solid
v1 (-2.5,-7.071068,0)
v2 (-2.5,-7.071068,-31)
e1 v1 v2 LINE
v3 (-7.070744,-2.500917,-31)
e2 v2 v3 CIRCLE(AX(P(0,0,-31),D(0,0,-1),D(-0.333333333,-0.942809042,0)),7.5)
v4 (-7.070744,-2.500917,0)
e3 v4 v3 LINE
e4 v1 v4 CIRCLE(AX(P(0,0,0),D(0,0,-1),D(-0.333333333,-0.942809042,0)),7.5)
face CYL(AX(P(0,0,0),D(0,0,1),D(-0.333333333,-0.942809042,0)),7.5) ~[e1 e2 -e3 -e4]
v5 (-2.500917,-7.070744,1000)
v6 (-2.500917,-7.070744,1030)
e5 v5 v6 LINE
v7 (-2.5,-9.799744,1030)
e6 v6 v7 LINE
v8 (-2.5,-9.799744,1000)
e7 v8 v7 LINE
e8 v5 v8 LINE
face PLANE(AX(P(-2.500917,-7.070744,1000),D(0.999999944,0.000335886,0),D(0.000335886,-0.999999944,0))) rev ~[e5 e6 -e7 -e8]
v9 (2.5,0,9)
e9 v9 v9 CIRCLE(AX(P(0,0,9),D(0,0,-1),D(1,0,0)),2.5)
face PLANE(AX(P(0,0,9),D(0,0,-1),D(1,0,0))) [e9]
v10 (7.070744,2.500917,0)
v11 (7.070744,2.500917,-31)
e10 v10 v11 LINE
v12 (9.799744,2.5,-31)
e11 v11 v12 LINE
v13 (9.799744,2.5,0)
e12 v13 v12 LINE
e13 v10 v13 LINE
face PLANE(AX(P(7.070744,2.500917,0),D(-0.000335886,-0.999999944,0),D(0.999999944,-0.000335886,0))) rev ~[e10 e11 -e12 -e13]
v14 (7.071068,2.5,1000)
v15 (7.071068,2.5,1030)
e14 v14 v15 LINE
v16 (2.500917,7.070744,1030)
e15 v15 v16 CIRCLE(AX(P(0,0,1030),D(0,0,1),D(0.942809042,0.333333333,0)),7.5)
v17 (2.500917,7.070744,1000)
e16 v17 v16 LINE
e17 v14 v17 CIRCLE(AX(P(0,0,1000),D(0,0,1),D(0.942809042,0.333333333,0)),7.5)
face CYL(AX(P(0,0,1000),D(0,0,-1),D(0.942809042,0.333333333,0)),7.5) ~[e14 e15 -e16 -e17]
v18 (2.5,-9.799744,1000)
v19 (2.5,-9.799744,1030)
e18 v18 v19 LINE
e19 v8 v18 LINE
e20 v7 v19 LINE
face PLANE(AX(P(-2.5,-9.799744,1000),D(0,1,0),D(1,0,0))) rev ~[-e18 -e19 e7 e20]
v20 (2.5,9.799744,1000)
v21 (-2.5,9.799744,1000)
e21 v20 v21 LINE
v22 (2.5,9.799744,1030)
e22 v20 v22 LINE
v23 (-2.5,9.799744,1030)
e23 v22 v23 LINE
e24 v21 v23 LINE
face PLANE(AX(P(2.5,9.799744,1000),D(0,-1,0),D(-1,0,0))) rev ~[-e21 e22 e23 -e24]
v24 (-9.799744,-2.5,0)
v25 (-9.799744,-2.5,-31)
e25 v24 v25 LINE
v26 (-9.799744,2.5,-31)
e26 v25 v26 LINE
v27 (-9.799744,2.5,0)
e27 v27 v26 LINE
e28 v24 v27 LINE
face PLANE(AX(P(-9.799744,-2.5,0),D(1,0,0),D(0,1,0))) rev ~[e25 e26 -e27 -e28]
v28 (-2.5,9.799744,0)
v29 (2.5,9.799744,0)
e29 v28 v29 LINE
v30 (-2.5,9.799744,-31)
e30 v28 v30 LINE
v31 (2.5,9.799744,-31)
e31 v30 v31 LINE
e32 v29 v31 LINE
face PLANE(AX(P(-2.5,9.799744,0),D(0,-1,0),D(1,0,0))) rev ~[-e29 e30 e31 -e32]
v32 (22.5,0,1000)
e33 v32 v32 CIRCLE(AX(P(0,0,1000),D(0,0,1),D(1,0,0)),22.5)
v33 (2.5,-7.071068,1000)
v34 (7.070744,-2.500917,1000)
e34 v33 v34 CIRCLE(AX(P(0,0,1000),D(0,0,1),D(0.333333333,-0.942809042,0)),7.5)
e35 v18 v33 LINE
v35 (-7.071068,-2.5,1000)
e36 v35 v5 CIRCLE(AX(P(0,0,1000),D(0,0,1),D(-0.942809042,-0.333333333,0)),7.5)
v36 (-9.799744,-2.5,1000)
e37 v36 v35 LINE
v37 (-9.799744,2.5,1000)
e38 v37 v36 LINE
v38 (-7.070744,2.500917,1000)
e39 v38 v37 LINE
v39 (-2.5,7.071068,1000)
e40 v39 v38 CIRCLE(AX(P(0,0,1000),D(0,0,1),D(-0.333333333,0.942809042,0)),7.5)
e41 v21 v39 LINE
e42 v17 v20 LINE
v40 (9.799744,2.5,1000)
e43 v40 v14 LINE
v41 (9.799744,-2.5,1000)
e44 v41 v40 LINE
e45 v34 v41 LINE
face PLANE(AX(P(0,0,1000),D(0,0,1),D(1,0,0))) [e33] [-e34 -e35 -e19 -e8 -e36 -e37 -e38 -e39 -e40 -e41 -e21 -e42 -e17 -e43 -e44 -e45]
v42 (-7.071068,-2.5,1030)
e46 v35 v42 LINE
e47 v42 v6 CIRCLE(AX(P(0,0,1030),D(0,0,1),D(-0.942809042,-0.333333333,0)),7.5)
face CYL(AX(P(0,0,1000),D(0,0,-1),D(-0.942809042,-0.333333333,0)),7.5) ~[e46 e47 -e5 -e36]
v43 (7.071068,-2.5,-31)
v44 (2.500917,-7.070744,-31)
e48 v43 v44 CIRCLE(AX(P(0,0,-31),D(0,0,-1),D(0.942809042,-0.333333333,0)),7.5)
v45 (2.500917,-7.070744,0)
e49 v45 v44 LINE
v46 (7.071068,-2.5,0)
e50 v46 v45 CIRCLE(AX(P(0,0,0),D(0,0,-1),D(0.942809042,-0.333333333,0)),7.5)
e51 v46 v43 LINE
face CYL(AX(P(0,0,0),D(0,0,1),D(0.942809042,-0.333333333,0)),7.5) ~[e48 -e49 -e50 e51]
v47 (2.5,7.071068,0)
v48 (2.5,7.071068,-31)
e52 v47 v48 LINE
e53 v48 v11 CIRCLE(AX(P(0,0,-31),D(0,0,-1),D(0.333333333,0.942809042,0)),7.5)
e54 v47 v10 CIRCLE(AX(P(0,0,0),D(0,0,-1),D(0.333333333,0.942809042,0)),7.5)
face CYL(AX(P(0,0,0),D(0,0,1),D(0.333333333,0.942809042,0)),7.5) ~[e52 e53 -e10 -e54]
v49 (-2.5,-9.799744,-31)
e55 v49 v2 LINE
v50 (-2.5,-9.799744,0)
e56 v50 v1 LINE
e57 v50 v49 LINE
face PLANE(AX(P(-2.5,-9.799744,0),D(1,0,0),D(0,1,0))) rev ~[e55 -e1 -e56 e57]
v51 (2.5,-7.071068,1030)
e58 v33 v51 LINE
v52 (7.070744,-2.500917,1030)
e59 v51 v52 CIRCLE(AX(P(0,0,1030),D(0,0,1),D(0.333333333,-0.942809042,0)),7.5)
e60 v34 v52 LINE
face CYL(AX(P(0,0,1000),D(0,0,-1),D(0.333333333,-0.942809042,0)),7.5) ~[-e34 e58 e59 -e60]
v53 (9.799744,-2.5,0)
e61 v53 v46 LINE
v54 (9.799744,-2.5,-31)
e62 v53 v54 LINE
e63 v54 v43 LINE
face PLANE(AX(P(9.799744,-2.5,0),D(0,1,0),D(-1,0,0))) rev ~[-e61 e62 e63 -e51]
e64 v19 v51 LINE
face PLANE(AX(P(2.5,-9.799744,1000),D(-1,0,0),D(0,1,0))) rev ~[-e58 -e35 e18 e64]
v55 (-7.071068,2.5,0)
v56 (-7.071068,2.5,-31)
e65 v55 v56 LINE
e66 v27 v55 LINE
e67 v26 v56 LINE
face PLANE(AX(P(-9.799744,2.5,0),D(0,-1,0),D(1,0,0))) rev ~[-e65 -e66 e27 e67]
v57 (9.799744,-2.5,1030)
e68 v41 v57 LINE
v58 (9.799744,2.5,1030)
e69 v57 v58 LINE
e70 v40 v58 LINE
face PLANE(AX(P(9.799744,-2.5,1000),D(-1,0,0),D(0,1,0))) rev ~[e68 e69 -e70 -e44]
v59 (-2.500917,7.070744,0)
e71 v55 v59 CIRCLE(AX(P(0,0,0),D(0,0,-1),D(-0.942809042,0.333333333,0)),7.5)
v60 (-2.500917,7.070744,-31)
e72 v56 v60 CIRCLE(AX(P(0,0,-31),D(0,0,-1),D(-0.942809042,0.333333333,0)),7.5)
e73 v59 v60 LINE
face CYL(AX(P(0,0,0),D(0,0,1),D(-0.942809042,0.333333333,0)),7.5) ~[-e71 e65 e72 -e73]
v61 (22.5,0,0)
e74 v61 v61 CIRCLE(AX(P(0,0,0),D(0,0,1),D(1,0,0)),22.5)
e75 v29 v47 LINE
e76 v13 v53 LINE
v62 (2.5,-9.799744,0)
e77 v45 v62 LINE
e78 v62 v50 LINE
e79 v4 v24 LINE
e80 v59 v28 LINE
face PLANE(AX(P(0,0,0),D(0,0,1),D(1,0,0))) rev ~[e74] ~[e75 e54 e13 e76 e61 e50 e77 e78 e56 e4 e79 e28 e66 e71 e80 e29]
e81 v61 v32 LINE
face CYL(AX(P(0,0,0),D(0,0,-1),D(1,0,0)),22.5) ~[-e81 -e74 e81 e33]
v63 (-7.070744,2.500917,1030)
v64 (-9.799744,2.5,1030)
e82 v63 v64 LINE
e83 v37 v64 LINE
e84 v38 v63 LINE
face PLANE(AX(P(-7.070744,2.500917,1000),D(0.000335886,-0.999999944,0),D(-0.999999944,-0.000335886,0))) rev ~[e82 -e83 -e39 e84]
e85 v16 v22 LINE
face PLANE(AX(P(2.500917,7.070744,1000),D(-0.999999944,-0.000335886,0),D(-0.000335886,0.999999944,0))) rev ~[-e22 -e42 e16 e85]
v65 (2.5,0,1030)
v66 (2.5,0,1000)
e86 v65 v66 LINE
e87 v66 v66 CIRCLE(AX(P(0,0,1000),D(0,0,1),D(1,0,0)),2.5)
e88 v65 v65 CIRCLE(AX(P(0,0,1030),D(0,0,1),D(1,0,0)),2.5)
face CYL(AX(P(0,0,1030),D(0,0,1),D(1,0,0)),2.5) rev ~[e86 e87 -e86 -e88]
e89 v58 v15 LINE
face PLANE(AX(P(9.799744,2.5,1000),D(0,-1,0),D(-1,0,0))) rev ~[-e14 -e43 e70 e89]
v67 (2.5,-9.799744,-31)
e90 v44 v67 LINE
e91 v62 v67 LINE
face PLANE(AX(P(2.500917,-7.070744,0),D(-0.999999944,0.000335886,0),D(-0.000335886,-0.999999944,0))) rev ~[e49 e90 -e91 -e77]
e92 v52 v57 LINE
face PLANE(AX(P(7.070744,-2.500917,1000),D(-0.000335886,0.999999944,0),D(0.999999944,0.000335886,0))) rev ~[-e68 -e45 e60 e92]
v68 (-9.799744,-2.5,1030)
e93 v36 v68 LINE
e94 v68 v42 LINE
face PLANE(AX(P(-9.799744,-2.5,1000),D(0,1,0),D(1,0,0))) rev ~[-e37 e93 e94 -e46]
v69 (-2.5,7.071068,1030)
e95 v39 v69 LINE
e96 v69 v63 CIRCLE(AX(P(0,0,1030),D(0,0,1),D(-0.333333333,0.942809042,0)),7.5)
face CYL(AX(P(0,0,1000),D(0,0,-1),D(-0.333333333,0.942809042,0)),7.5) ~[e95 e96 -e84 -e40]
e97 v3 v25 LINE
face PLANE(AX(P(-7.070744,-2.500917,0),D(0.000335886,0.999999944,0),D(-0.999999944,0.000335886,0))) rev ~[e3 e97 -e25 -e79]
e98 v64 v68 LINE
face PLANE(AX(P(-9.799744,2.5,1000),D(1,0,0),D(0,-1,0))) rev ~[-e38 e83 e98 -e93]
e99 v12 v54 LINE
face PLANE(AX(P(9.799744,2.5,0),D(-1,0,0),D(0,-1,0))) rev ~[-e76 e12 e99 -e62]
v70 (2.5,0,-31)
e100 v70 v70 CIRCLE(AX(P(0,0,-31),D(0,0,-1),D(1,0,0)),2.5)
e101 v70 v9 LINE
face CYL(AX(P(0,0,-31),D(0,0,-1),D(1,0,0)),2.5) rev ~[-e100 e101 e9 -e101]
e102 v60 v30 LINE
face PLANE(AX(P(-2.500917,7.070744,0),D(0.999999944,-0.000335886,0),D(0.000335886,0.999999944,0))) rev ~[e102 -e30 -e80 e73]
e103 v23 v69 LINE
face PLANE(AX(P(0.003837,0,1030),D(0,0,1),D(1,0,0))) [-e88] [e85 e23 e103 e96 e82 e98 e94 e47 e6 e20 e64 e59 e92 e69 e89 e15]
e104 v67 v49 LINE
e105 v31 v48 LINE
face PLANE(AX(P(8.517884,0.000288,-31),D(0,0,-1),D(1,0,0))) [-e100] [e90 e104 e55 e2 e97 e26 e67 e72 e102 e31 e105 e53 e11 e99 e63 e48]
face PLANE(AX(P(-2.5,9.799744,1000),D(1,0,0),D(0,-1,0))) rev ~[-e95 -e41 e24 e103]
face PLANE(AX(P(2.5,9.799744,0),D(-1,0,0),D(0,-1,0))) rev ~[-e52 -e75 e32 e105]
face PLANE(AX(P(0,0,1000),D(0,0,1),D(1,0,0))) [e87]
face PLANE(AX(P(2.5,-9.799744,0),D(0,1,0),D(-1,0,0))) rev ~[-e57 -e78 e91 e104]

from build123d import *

# Parameters (mm, degrees)
F0_R     = 22.5
F1_DEPTH = 1000
F4_DEPTH = 31
F5_R     = 2.5
F6_DEPTH = 40
F7_DEPTH = 30
F8_R     = 2.5
F9_DEPTH = 30


with BuildPart() as f1:
    # F0 (on Top) → F1 (new body)
    with BuildSketch(Plane.XY):
        Circle(F0_R)
    extrude(amount=F1_DEPTH)

    # F3 (on face) → F4 (join)
    with BuildSketch(Plane(origin=(0, 0, 0), x_dir=(1, 0, 0), z_dir=(0, 0, -1))):
        with BuildLine():
            ThreePointArc((7.0710678119, 2.5), (7.3919891974, 1.2682648404), (7.5, 0))
            ThreePointArc((7.5, 0), (7.3919069765, -1.268743966), (7.0707436663, -2.500916633))
            Line((7.0707436663, -2.500916633), (9.7997435124, -2.5))
            Line((9.7997435124, -2.5), (9.7997435124, 0))
            Line((9.7997435124, 0), (9.7997435124, 2.5))
            Line((9.7997435124, 2.5), (7.0710678119, 2.5))
        make_face()
        with BuildLine():
            Line((2.5, -9.7997435124), (2.5, -7.0710678119))
            ThreePointArc((2.5, -7.0710678119), (-0.0004861292, -7.4999999842), (-2.500916633, -7.0707436663))
            Line((-2.500916633, -7.0707436663), (-2.5, -9.7997435124))
            Line((-2.5, -9.7997435124), (0, -9.7997435124))
            Line((0, -9.7997435124), (2.5, -9.7997435124))
        make_face()
        with BuildLine():
            ThreePointArc((-7.0710678119, -2.5), (-7.4999999842, 0.0004861292), (-7.0707436663, 2.500916633))
            Line((-7.0707436663, 2.500916633), (-9.7997435124, 2.5))
            Line((-9.7997435124, 2.5), (-9.7997435124, 0))
            Line((-9.7997435124, 0), (-9.7997435124, -2.5))
            Line((-9.7997435124, -2.5), (-7.0710678119, -2.5))
        make_face()
        with BuildLine():
            ThreePointArc((7.0707436663, -2.500916633), (7.3919069765, -1.268743966), (7.5, 0))
            ThreePointArc((7.5, 0), (7.3919891974, 1.2682648404), (7.0710678119, 2.5))
            ThreePointArc((7.0710678119, 2.5), (5.303644593, 5.3029571025), (2.500916633, 7.0707436663))
            ThreePointArc((2.500916633, 7.0707436663), (0.0004861292, 7.4999999842), (-2.5, 7.0710678119))
            ThreePointArc((-2.5, 7.0710678119), (-5.3029571025, 5.303644593), (-7.0707436663, 2.500916633))
            ThreePointArc((-7.0707436663, 2.500916633), (-7.4999999842, 0.0004861292), (-7.0710678119, -2.5))
            ThreePointArc((-7.0710678119, -2.5), (-5.303644593, -5.3029571025), (-2.500916633, -7.0707436663))
            ThreePointArc((-2.500916633, -7.0707436663), (-0.0004861292, -7.4999999842), (2.5, -7.0710678119))
            ThreePointArc((2.5, -7.0710678119), (5.3029571025, -5.303644593), (7.0707436663, -2.500916633))
        make_face()
        with BuildLine():
            ThreePointArc((-2.5, 7.0710678119), (0.0004861292, 7.4999999842), (2.500916633, 7.0707436663))
            Line((2.500916633, 7.0707436663), (2.5, 9.7997435124))
            Line((2.5, 9.7997435124), (0, 9.7997435124))
            Line((0, 9.7997435124), (-2.5, 9.7997435124))
            Line((-2.5, 9.7997435124), (-2.5, 7.0710678119))
        make_face()
    extrude(amount=F4_DEPTH)

    # F5 (on face) → F6 (cut)
    with BuildSketch(Plane(origin=(0, 0, -31), x_dir=(1, 0, 0), z_dir=(0, 0, -1))):
        Circle(F5_R)
    extrude(amount=-F6_DEPTH, mode=Mode.SUBTRACT)

    # F2 (on face) → F7 (join)
    with BuildSketch(Plane.XY.offset(1000)):
        with BuildLine():
            ThreePointArc((7.0707436663, -2.500916633), (7.3919069765, -1.268743966), (7.5, 0))
            ThreePointArc((7.5, 0), (7.3919891974, 1.2682648404), (7.0710678119, 2.5))
            ThreePointArc((7.0710678119, 2.5), (5.303644593, 5.3029571025), (2.500916633, 7.0707436663))
            ThreePointArc((2.500916633, 7.0707436663), (0.0004861292, 7.4999999842), (-2.5, 7.0710678119))
            ThreePointArc((-2.5, 7.0710678119), (-5.3029571025, 5.303644593), (-7.0707436663, 2.500916633))
            ThreePointArc((-7.0707436663, 2.500916633), (-7.4999999842, 0.0004861292), (-7.0710678119, -2.5))
            ThreePointArc((-7.0710678119, -2.5), (-5.303644593, -5.3029571025), (-2.500916633, -7.0707436663))
            ThreePointArc((-2.500916633, -7.0707436663), (-0.0004861292, -7.4999999842), (2.5, -7.0710678119))
            ThreePointArc((2.5, -7.0710678119), (5.3029571025, -5.303644593), (7.0707436663, -2.500916633))
        make_face()
        with BuildLine():
            ThreePointArc((-7.0710678119, -2.5), (-7.4999999842, 0.0004861292), (-7.0707436663, 2.500916633))
            Line((-7.0707436663, 2.500916633), (-9.7997435124, 2.5))
            Line((-9.7997435124, 2.5), (-9.7997435124, 0))
            Line((-9.7997435124, 0), (-9.7997435124, -2.5))
            Line((-9.7997435124, -2.5), (-7.0710678119, -2.5))
        make_face()
        with BuildLine():
            ThreePointArc((-2.5, 7.0710678119), (0.0004861292, 7.4999999842), (2.500916633, 7.0707436663))
            Line((2.500916633, 7.0707436663), (2.5, 9.7997435124))
            Line((2.5, 9.7997435124), (0, 9.7997435124))
            Line((0, 9.7997435124), (-2.5, 9.7997435124))
            Line((-2.5, 9.7997435124), (-2.5, 7.0710678119))
        make_face()
        with BuildLine():
            ThreePointArc((7.0710678119, 2.5), (7.3919891974, 1.2682648404), (7.5, 0))
            ThreePointArc((7.5, 0), (7.3919069765, -1.268743966), (7.0707436663, -2.500916633))
            Line((7.0707436663, -2.500916633), (9.7997435124, -2.5))
            Line((9.7997435124, -2.5), (9.7997435124, 0))
            Line((9.7997435124, 0), (9.7997435124, 2.5))
            Line((9.7997435124, 2.5), (7.0710678119, 2.5))
        make_face()
        with BuildLine():
            Line((2.5, -9.7997435124), (2.5, -7.0710678119))
            ThreePointArc((2.5, -7.0710678119), (-0.0004861292, -7.4999999842), (-2.500916633, -7.0707436663))
            Line((-2.500916633, -7.0707436663), (-2.5, -9.7997435124))
            Line((-2.5, -9.7997435124), (0, -9.7997435124))
            Line((0, -9.7997435124), (2.5, -9.7997435124))
        make_face()
    extrude(amount=F7_DEPTH)

    # F8 (on face) → F9 (cut)
    with BuildSketch(Plane.XY.offset(1030)):
        Circle(F8_R)
    extrude(amount=-F9_DEPTH, mode=Mode.SUBTRACT)


solid = f1.part
